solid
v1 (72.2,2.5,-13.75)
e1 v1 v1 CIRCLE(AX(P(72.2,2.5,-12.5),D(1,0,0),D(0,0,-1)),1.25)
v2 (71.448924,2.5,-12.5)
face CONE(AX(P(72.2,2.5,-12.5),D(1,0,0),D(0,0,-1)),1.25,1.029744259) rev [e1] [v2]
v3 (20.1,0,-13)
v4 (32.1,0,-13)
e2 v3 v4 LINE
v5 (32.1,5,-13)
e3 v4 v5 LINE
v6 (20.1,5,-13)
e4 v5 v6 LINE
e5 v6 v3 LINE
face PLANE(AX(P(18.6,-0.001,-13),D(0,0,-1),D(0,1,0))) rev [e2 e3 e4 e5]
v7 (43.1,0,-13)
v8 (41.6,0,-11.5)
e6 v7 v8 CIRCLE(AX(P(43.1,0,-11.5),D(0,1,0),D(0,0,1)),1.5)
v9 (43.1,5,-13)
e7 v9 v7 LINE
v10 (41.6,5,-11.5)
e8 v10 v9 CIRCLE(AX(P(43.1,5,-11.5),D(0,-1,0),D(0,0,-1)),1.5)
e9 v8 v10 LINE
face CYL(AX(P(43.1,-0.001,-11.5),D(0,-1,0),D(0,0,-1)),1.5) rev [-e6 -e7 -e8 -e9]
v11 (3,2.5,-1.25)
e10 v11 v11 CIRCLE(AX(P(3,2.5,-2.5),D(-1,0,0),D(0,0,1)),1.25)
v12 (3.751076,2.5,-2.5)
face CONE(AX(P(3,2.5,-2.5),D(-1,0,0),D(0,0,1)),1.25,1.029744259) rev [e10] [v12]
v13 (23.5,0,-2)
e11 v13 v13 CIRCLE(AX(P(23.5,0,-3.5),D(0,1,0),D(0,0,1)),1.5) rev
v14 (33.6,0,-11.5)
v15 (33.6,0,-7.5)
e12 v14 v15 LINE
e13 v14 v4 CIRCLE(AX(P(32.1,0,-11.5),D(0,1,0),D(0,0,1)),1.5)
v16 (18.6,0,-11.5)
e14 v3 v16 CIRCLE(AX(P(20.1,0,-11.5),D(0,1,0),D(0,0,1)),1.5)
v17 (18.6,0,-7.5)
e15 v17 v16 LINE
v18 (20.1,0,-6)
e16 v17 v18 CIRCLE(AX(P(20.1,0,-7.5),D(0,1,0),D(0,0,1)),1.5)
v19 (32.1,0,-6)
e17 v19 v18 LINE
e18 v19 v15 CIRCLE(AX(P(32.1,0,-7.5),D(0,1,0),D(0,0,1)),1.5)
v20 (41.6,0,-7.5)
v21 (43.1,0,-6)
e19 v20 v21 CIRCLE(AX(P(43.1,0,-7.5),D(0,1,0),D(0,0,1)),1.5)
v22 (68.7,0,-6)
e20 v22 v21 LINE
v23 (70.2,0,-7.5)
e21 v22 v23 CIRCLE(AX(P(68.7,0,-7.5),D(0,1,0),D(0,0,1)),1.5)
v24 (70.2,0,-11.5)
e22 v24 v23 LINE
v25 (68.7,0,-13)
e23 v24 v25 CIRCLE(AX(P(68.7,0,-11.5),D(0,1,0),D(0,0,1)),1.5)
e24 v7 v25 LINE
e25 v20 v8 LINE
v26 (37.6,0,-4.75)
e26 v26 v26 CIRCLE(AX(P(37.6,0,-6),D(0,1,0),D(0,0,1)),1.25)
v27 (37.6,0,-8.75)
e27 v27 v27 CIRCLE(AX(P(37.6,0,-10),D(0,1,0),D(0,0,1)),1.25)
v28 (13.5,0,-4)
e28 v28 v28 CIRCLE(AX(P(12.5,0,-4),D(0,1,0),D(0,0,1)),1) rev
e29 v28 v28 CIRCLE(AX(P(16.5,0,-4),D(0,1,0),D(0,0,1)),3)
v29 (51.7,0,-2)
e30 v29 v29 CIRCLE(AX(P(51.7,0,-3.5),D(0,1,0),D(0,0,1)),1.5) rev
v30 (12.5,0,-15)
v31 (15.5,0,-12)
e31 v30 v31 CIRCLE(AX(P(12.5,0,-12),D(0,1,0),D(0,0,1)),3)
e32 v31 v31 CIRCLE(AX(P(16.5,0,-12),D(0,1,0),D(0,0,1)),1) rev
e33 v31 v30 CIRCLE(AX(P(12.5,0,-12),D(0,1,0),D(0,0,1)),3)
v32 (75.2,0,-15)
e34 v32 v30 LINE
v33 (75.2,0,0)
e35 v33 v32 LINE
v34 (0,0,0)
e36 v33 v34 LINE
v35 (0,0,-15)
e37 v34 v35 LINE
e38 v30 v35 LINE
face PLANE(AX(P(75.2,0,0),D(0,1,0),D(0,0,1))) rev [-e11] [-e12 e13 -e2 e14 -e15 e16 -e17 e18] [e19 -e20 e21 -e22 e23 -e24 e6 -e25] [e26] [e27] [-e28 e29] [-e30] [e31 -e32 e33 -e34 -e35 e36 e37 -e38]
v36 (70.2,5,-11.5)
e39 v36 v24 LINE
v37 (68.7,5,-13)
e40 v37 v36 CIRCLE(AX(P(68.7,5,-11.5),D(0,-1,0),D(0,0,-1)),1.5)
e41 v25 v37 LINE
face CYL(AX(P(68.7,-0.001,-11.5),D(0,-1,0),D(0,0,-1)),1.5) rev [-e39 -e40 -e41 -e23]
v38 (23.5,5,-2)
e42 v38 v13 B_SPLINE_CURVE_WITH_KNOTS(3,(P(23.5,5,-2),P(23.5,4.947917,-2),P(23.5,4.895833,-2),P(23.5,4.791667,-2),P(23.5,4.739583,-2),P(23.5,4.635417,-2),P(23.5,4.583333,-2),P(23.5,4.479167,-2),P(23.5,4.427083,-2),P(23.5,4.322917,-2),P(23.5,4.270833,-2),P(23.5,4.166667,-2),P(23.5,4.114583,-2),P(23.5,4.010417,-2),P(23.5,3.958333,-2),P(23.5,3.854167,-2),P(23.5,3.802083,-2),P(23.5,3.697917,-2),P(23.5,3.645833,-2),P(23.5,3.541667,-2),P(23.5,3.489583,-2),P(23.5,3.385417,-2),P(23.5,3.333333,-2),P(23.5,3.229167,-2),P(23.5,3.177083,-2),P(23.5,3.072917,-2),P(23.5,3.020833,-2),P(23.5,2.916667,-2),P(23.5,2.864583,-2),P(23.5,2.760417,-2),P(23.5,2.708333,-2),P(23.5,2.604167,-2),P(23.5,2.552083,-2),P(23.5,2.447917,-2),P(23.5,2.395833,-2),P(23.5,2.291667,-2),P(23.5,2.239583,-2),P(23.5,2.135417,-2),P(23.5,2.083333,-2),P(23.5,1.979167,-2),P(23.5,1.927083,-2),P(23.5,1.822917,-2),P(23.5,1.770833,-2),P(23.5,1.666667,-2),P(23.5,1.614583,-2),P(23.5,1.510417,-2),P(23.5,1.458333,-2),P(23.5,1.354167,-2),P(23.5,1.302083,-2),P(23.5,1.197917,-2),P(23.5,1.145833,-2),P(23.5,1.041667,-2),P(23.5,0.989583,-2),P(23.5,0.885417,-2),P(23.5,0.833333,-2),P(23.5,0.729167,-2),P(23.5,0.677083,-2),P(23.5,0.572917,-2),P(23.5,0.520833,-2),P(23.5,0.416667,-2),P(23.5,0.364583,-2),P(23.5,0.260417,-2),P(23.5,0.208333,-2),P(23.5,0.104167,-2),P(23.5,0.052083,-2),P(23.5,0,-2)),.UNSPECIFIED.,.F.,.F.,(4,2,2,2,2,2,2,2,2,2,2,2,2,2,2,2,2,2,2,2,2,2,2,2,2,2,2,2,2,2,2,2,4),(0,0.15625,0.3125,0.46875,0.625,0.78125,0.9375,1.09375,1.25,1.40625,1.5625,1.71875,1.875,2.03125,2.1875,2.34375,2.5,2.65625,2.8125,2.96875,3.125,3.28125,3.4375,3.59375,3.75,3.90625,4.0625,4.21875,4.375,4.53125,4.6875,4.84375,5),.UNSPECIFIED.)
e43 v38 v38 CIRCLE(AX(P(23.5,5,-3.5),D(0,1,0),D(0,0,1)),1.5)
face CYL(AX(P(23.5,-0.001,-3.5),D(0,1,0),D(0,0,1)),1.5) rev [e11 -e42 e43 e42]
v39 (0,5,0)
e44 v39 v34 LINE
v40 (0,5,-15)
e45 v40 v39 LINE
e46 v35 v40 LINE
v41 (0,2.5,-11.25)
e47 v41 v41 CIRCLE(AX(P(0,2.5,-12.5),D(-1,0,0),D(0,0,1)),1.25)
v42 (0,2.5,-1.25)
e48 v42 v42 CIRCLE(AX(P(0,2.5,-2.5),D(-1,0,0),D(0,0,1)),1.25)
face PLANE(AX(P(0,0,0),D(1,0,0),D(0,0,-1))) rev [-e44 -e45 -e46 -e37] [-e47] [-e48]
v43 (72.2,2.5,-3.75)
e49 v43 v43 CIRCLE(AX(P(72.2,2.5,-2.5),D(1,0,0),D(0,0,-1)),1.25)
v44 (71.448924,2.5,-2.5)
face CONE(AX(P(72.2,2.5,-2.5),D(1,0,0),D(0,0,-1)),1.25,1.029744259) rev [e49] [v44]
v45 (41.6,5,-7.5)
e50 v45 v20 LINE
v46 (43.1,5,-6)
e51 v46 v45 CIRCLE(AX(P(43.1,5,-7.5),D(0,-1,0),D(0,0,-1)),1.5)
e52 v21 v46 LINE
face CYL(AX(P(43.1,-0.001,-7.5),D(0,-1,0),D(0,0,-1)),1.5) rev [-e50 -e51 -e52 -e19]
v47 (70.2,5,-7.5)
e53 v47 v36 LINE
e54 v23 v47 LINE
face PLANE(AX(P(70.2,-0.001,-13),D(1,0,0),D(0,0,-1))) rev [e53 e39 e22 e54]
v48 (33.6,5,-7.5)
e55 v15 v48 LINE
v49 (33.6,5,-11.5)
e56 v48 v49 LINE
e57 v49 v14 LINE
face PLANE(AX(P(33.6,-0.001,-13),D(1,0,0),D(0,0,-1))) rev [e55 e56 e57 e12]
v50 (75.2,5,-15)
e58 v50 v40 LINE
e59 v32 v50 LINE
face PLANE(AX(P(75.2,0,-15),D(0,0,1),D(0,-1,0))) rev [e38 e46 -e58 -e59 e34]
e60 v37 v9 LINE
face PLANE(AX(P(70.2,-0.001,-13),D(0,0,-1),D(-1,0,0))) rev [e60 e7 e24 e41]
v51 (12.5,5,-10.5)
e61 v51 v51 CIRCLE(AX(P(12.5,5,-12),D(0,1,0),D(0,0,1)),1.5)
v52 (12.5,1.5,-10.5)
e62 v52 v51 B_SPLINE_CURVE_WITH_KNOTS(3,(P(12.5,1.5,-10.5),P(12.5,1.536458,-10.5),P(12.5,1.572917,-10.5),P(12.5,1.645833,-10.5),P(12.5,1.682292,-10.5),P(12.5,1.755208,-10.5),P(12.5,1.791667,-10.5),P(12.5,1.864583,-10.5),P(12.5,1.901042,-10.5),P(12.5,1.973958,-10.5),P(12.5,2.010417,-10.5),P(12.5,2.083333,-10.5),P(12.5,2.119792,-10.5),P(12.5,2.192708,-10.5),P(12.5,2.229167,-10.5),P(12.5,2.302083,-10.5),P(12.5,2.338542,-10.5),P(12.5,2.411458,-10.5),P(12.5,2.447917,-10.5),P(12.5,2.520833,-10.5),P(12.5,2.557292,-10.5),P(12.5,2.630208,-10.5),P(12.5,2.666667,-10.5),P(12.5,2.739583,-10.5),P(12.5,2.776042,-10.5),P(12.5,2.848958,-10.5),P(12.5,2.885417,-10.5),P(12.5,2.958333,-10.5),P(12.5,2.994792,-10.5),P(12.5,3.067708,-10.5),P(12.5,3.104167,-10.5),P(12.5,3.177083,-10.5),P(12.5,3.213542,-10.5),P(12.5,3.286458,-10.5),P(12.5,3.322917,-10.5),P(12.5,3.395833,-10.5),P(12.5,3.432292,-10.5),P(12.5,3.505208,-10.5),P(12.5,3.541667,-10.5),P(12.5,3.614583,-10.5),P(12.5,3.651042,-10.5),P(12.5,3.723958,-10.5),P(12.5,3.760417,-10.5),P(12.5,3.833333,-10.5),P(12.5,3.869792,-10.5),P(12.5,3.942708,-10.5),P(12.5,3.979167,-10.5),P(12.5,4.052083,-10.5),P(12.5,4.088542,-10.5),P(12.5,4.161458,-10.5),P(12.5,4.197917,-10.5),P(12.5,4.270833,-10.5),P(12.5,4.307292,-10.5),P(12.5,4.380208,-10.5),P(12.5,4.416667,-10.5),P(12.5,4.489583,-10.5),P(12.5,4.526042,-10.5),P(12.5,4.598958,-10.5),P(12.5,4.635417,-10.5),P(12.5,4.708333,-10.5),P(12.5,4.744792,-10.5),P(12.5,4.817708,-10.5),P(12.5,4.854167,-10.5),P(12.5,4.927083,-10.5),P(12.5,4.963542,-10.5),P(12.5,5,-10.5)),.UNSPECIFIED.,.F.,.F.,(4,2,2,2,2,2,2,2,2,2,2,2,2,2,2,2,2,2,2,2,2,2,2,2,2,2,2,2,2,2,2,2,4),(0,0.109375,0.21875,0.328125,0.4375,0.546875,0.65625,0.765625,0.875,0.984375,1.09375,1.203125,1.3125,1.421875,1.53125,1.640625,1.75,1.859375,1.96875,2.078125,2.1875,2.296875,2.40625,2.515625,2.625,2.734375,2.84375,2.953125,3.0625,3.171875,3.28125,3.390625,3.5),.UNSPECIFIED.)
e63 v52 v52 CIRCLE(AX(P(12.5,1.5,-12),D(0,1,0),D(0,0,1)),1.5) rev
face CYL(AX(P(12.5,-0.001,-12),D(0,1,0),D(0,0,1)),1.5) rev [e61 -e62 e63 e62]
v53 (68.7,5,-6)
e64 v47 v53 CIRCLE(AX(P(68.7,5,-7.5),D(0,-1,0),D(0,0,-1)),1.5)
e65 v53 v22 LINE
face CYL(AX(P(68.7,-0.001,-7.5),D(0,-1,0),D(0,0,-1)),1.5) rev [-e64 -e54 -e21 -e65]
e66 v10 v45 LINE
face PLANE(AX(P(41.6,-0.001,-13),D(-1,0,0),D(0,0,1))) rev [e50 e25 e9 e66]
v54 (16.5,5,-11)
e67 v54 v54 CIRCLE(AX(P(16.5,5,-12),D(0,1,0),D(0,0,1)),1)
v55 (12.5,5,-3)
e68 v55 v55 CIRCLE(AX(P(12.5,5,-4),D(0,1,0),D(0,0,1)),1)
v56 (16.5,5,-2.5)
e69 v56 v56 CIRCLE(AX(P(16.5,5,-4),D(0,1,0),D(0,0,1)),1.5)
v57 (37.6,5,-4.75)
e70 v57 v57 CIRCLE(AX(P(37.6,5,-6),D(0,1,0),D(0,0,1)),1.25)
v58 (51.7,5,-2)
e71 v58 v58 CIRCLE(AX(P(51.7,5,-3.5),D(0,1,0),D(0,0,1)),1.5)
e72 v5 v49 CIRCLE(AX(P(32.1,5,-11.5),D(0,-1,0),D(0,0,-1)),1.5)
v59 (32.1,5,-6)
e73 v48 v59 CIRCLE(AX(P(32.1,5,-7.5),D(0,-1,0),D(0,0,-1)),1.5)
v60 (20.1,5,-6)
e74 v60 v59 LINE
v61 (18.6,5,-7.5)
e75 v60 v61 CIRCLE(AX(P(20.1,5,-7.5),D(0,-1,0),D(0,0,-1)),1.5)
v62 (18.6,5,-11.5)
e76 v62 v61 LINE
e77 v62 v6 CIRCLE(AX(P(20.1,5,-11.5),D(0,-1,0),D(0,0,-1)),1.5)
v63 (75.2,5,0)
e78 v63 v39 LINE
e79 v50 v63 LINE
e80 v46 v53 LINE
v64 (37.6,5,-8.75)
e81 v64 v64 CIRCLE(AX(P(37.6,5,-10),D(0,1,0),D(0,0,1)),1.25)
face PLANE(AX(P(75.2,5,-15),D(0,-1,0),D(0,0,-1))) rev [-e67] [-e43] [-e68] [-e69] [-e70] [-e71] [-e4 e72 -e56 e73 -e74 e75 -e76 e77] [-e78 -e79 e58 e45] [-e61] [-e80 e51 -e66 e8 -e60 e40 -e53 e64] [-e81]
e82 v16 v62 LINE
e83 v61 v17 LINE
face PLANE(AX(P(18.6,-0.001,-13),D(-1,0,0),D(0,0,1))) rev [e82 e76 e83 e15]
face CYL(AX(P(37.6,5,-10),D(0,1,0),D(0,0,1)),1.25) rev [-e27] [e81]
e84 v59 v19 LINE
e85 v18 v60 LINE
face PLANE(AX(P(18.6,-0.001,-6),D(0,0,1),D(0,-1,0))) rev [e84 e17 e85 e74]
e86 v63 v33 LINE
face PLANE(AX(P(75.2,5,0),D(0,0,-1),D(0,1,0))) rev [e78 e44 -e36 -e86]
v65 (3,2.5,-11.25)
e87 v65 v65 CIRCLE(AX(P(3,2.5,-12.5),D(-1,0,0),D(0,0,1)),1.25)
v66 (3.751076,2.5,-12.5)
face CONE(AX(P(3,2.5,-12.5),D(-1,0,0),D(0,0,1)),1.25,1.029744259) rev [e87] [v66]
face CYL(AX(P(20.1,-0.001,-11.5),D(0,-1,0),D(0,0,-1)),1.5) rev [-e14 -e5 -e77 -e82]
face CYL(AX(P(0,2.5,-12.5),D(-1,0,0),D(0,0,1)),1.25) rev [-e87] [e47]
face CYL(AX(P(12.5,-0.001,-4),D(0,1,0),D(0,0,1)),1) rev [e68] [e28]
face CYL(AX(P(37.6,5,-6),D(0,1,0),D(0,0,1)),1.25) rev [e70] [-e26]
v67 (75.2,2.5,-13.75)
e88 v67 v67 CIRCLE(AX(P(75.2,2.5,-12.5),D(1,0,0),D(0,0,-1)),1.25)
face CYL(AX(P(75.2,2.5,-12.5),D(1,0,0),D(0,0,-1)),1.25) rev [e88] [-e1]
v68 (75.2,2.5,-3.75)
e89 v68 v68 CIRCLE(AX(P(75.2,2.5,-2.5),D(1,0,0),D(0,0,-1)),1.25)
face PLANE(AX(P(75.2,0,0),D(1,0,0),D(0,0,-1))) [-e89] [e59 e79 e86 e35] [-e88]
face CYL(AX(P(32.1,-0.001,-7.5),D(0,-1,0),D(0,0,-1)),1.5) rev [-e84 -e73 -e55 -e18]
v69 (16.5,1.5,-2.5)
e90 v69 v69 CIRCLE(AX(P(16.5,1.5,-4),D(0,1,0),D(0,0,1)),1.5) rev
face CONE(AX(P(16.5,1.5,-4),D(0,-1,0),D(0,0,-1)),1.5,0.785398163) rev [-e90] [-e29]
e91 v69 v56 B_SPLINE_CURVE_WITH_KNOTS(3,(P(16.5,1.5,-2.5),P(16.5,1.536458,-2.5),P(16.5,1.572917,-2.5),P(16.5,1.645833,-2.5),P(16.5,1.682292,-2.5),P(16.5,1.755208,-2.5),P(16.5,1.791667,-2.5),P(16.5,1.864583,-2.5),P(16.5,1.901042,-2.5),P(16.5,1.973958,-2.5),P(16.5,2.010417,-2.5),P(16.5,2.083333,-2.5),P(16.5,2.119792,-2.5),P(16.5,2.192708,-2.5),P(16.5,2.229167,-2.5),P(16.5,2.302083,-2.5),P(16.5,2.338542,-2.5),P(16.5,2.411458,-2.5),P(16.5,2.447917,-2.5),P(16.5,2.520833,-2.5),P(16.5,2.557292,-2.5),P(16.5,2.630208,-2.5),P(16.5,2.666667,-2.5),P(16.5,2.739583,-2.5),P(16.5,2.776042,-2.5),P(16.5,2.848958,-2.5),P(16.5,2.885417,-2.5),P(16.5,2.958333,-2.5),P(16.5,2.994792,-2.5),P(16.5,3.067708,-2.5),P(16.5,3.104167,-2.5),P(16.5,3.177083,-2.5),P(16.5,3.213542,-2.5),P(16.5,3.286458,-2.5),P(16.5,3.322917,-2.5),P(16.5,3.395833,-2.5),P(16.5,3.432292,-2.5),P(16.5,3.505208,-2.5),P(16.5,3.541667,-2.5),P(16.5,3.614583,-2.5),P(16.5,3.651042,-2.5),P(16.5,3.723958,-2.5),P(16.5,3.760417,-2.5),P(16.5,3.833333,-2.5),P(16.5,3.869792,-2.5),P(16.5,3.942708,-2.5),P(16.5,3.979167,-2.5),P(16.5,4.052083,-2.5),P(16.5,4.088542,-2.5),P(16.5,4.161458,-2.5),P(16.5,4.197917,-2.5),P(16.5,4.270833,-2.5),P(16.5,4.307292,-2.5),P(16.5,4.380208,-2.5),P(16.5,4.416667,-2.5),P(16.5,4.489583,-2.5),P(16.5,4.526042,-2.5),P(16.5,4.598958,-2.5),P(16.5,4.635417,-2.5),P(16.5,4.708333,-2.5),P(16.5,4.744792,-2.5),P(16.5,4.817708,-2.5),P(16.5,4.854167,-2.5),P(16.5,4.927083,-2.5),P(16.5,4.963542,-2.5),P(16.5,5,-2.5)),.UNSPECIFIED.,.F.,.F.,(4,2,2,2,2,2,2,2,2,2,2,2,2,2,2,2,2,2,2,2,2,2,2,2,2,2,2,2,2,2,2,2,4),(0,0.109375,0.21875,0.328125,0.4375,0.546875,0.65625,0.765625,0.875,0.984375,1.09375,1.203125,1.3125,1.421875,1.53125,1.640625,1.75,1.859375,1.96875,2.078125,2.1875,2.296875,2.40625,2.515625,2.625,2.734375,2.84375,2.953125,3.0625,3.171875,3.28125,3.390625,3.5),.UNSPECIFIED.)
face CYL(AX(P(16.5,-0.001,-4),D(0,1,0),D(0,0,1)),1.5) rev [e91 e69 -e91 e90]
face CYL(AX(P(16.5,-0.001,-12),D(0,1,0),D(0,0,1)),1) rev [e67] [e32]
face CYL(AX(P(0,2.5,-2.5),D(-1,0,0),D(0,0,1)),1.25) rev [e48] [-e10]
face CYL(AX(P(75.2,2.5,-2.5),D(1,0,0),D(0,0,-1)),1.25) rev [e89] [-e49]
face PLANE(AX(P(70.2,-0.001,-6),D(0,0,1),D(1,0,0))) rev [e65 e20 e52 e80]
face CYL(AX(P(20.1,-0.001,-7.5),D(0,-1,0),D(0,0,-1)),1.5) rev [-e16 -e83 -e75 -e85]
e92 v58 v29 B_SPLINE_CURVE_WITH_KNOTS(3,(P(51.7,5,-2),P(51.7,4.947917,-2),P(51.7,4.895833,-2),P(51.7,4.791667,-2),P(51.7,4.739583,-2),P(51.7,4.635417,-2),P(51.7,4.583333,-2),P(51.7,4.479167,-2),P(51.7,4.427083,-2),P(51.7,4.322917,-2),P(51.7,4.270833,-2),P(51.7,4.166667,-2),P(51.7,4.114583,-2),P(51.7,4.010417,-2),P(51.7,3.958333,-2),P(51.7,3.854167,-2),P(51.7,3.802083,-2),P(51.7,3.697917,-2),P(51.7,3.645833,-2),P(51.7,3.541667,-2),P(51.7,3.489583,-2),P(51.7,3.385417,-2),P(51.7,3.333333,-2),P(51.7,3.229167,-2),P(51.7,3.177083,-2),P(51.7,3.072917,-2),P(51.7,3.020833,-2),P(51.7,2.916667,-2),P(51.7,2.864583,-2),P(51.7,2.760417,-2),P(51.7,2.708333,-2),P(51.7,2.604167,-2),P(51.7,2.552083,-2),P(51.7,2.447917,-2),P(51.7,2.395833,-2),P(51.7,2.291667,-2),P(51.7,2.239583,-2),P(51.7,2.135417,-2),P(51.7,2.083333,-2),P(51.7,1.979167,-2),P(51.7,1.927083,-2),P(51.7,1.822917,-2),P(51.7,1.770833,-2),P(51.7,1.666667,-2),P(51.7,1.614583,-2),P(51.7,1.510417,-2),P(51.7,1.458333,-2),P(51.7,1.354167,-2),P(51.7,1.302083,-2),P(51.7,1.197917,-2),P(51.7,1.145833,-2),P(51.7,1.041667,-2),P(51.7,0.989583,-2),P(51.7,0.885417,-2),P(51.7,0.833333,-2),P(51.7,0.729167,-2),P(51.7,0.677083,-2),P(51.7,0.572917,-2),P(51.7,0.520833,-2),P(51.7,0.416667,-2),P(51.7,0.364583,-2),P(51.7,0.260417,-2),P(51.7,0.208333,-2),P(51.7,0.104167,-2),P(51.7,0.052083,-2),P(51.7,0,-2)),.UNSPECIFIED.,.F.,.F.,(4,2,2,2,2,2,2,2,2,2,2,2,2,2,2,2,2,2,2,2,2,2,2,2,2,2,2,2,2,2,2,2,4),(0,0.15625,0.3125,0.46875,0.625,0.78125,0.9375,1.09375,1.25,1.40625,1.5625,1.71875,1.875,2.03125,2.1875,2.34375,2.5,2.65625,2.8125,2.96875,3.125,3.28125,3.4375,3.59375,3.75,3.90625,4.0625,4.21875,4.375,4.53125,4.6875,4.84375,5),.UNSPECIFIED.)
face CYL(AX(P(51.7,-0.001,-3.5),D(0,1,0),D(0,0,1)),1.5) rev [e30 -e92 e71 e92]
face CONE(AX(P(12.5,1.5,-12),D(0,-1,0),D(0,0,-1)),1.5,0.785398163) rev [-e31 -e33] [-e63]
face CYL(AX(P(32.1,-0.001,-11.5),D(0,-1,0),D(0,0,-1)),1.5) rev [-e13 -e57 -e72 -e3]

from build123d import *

# Parameters (mm, degrees)
SKETCH1_W                       = 15
SKETCH1_H                       = 5
BOSS_EXTRUDE1_DEPTH             = 75.2
TAP_DRILL_FOR_M3X0_5_TAP1_D     = 2.5
TAP_DRILL_FOR_M3X0_5_TAP1_DEPTH = 3
TAP_DRILL_FOR_M3X0_5_TAP1_TIP   = 0.751075774
TAP_DRILL_FOR_M3X0_5_TAP2_D     = 2.5
TAP_DRILL_FOR_M3X0_5_TAP2_DEPTH = 3
TAP_DRILL_FOR_M3X0_5_TAP2_TIP   = 0.751075774
CUT_EXTRUDE1_REACH              = 78.844
SKETCH6_R                       = 1.5
SKETCH6_R_2                     = 1
SKETCH6_W                       = 28.6
SKETCH6_H                       = 7
SKETCH6_W_2                     = 15
FILLET1_R                       = 1.5
CHAMFER1_SIZE                   = 1.5
TAP_DRILL_FOR_M3X0_5_TAP3_D     = 2.5


with BuildPart() as part:
    # Sketch1 → Boss-Extrude1 (new body)
    with BuildSketch(Plane(origin=(0, 0, 0), x_dir=(0, 0, -1), z_dir=(1, 0, 0))):
        with Locations((7.5, 2.5)):
            Rectangle(SKETCH1_W, SKETCH1_H)
    extrude(amount=BOSS_EXTRUDE1_DEPTH)

    # Tap Drill for M3x0.5 Tap1
    with Locations(Plane(origin=(75.2, 0, 0), x_dir=(0, 0, -1), z_dir=(1, 0, 0))):
        with Locations((2.5, 2.5), (12.5, 2.5)):
            Hole(TAP_DRILL_FOR_M3X0_5_TAP1_D / 2, depth=TAP_DRILL_FOR_M3X0_5_TAP1_DEPTH)
            with Locations((0, 0, -(TAP_DRILL_FOR_M3X0_5_TAP1_DEPTH + TAP_DRILL_FOR_M3X0_5_TAP1_TIP / 2))):  # 118° drill point
                Cone(0, TAP_DRILL_FOR_M3X0_5_TAP1_D / 2, TAP_DRILL_FOR_M3X0_5_TAP1_TIP, mode=Mode.SUBTRACT)

    # Tap Drill for M3x0.5 Tap2
    with Locations(Plane.ZY):
        with Locations((-2.5, 2.5), (-12.5, 2.5)):
            Hole(TAP_DRILL_FOR_M3X0_5_TAP2_D / 2, depth=TAP_DRILL_FOR_M3X0_5_TAP2_DEPTH)
            with Locations((0, 0, -(TAP_DRILL_FOR_M3X0_5_TAP2_DEPTH + TAP_DRILL_FOR_M3X0_5_TAP2_TIP / 2))):  # 118° drill point
                Cone(0, TAP_DRILL_FOR_M3X0_5_TAP2_D / 2, TAP_DRILL_FOR_M3X0_5_TAP2_TIP, mode=Mode.SUBTRACT)

    # Sketch6 → Cut-Extrude1 (cut, up to next)
    with BuildSketch(Plane(origin=(0, 5, 0), x_dir=(1, 0, 0), z_dir=(0, 1, 0)), mode=Mode.PRIVATE) as cut_extrude1_sk1:
        with Locations(Location((23.5, 3.5, 0), (0, 0, 270))):
            Circle(SKETCH6_R)
    cut_extrude1_tool1 = extrude(cut_extrude1_sk1.sketch, amount=-CUT_EXTRUDE1_REACH, mode=Mode.PRIVATE) & part.part
    # Sketch6 → Cut-Extrude1 (cut, up to next)
    with BuildSketch(Plane(origin=(0, 5, 0), x_dir=(1, 0, 0), z_dir=(0, 1, 0)), mode=Mode.PRIVATE) as cut_extrude1_sk2:
        with Locations(Location((51.7, 3.5, 0), (0, 0, 270))):
            Circle(SKETCH6_R)
    cut_extrude1_tool2 = extrude(cut_extrude1_sk2.sketch, amount=-CUT_EXTRUDE1_REACH, mode=Mode.PRIVATE) & part.part
    # Sketch6 → Cut-Extrude1 (cut, up to next)
    with BuildSketch(Plane(origin=(0, 5, 0), x_dir=(1, 0, 0), z_dir=(0, 1, 0)), mode=Mode.PRIVATE) as cut_extrude1_sk3:
        with Locations(Location((12.5, 12, 0), (0, 0, 270))):
            Circle(SKETCH6_R)
    cut_extrude1_tool3 = extrude(cut_extrude1_sk3.sketch, amount=-CUT_EXTRUDE1_REACH, mode=Mode.PRIVATE) & part.part
    # Sketch6 → Cut-Extrude1 (cut, up to next)
    with BuildSketch(Plane(origin=(0, 5, 0), x_dir=(1, 0, 0), z_dir=(0, 1, 0)), mode=Mode.PRIVATE) as cut_extrude1_sk4:
        with Locations(Location((16.5, 12, 0), (0, 0, 270))):
            Circle(SKETCH6_R_2)
    cut_extrude1_tool4 = extrude(cut_extrude1_sk4.sketch, amount=-CUT_EXTRUDE1_REACH, mode=Mode.PRIVATE) & part.part
    # Sketch6 → Cut-Extrude1 (cut, up to next)
    with BuildSketch(Plane(origin=(0, 5, 0), x_dir=(1, 0, 0), z_dir=(0, 1, 0)), mode=Mode.PRIVATE) as cut_extrude1_sk5:
        with Locations(Location((12.5, 4, 0), (0, 0, 270))):
            Circle(SKETCH6_R_2)
    cut_extrude1_tool5 = extrude(cut_extrude1_sk5.sketch, amount=-CUT_EXTRUDE1_REACH, mode=Mode.PRIVATE) & part.part
    # Sketch6 → Cut-Extrude1 (cut, up to next)
    with BuildSketch(Plane(origin=(0, 5, 0), x_dir=(1, 0, 0), z_dir=(0, 1, 0)), mode=Mode.PRIVATE) as cut_extrude1_sk6:
        with Locations(Location((16.5, 4, 0), (0, 0, 270))):
            Circle(SKETCH6_R)
    cut_extrude1_tool6 = extrude(cut_extrude1_sk6.sketch, amount=-CUT_EXTRUDE1_REACH, mode=Mode.PRIVATE) & part.part
    # Sketch6 → Cut-Extrude1 (cut, up to next)
    with BuildSketch(Plane(origin=(0, 5, 0), x_dir=(1, 0, 0), z_dir=(0, 1, 0)), mode=Mode.PRIVATE) as cut_extrude1_sk7:
        with Locations((55.9, 9.5)):
            Rectangle(SKETCH6_W, SKETCH6_H)
    cut_extrude1_tool7 = extrude(cut_extrude1_sk7.sketch, amount=-CUT_EXTRUDE1_REACH, mode=Mode.PRIVATE) & part.part
    # Sketch6 → Cut-Extrude1 (cut, up to next)
    with BuildSketch(Plane(origin=(0, 5, 0), x_dir=(1, 0, 0), z_dir=(0, 1, 0)), mode=Mode.PRIVATE) as cut_extrude1_sk8:
        with Locations((26.1, 9.5)):
            Rectangle(SKETCH6_W_2, SKETCH6_H)
    cut_extrude1_tool8 = extrude(cut_extrude1_sk8.sketch, amount=-CUT_EXTRUDE1_REACH, mode=Mode.PRIVATE) & part.part
    add(cut_extrude1_tool1.solids().sort_by_distance((23.5, 5, -3.5))[0], mode=Mode.SUBTRACT)
    add(cut_extrude1_tool2.solids().sort_by_distance((51.7, 5, -3.5))[0], mode=Mode.SUBTRACT)
    add(cut_extrude1_tool3.solids().sort_by_distance((12.5, 5, -12))[0], mode=Mode.SUBTRACT)
    add(cut_extrude1_tool4.solids().sort_by_distance((16.5, 5, -12))[0], mode=Mode.SUBTRACT)
    add(cut_extrude1_tool5.solids().sort_by_distance((12.5, 5, -4))[0], mode=Mode.SUBTRACT)
    add(cut_extrude1_tool6.solids().sort_by_distance((16.5, 5, -4))[0], mode=Mode.SUBTRACT)
    add(cut_extrude1_tool7.solids().sort_by_distance((55.9, 5, -9.5))[0], mode=Mode.SUBTRACT)
    add(cut_extrude1_tool8.solids().sort_by_distance((26.1, 5, -9.5))[0], mode=Mode.SUBTRACT)

    # Fillet1
    fillet1_edges = [part.edges().sort_by_distance(p)[0] for p in [
        (70.2, 2.5, -13),
        (70.2, 2.5, -6),
        (41.6, 2.5, -6),
        (41.6, 2.5, -13),
        (18.6, 2.5, -6),
        (18.6, 2.5, -13),
        (33.6, 2.5, -13),
        (33.6, 2.5, -6),
    ]]
    fillet(fillet1_edges, radius=FILLET1_R)

    # Chamfer1
    chamfer1_edges = [part.edges().sort_by_distance(p)[0] for p in [
        (12.5, 0, -13.5),
        (16.5, 0, -5.5),
    ]]
    chamfer(chamfer1_edges, length=CHAMFER1_SIZE - 0.0001)  # a hair under: the kernel refuses the full size

    # Tap Drill for M3x0.5 Tap3 (through all)
    with Locations(Plane(origin=(0, 5, 0), x_dir=(1, 0, 0), z_dir=(0, 1, 0))):
        with Locations((37.6, 10), (37.6, 6)):
            Hole(TAP_DRILL_FOR_M3X0_5_TAP3_D / 2)


solid = part.part
